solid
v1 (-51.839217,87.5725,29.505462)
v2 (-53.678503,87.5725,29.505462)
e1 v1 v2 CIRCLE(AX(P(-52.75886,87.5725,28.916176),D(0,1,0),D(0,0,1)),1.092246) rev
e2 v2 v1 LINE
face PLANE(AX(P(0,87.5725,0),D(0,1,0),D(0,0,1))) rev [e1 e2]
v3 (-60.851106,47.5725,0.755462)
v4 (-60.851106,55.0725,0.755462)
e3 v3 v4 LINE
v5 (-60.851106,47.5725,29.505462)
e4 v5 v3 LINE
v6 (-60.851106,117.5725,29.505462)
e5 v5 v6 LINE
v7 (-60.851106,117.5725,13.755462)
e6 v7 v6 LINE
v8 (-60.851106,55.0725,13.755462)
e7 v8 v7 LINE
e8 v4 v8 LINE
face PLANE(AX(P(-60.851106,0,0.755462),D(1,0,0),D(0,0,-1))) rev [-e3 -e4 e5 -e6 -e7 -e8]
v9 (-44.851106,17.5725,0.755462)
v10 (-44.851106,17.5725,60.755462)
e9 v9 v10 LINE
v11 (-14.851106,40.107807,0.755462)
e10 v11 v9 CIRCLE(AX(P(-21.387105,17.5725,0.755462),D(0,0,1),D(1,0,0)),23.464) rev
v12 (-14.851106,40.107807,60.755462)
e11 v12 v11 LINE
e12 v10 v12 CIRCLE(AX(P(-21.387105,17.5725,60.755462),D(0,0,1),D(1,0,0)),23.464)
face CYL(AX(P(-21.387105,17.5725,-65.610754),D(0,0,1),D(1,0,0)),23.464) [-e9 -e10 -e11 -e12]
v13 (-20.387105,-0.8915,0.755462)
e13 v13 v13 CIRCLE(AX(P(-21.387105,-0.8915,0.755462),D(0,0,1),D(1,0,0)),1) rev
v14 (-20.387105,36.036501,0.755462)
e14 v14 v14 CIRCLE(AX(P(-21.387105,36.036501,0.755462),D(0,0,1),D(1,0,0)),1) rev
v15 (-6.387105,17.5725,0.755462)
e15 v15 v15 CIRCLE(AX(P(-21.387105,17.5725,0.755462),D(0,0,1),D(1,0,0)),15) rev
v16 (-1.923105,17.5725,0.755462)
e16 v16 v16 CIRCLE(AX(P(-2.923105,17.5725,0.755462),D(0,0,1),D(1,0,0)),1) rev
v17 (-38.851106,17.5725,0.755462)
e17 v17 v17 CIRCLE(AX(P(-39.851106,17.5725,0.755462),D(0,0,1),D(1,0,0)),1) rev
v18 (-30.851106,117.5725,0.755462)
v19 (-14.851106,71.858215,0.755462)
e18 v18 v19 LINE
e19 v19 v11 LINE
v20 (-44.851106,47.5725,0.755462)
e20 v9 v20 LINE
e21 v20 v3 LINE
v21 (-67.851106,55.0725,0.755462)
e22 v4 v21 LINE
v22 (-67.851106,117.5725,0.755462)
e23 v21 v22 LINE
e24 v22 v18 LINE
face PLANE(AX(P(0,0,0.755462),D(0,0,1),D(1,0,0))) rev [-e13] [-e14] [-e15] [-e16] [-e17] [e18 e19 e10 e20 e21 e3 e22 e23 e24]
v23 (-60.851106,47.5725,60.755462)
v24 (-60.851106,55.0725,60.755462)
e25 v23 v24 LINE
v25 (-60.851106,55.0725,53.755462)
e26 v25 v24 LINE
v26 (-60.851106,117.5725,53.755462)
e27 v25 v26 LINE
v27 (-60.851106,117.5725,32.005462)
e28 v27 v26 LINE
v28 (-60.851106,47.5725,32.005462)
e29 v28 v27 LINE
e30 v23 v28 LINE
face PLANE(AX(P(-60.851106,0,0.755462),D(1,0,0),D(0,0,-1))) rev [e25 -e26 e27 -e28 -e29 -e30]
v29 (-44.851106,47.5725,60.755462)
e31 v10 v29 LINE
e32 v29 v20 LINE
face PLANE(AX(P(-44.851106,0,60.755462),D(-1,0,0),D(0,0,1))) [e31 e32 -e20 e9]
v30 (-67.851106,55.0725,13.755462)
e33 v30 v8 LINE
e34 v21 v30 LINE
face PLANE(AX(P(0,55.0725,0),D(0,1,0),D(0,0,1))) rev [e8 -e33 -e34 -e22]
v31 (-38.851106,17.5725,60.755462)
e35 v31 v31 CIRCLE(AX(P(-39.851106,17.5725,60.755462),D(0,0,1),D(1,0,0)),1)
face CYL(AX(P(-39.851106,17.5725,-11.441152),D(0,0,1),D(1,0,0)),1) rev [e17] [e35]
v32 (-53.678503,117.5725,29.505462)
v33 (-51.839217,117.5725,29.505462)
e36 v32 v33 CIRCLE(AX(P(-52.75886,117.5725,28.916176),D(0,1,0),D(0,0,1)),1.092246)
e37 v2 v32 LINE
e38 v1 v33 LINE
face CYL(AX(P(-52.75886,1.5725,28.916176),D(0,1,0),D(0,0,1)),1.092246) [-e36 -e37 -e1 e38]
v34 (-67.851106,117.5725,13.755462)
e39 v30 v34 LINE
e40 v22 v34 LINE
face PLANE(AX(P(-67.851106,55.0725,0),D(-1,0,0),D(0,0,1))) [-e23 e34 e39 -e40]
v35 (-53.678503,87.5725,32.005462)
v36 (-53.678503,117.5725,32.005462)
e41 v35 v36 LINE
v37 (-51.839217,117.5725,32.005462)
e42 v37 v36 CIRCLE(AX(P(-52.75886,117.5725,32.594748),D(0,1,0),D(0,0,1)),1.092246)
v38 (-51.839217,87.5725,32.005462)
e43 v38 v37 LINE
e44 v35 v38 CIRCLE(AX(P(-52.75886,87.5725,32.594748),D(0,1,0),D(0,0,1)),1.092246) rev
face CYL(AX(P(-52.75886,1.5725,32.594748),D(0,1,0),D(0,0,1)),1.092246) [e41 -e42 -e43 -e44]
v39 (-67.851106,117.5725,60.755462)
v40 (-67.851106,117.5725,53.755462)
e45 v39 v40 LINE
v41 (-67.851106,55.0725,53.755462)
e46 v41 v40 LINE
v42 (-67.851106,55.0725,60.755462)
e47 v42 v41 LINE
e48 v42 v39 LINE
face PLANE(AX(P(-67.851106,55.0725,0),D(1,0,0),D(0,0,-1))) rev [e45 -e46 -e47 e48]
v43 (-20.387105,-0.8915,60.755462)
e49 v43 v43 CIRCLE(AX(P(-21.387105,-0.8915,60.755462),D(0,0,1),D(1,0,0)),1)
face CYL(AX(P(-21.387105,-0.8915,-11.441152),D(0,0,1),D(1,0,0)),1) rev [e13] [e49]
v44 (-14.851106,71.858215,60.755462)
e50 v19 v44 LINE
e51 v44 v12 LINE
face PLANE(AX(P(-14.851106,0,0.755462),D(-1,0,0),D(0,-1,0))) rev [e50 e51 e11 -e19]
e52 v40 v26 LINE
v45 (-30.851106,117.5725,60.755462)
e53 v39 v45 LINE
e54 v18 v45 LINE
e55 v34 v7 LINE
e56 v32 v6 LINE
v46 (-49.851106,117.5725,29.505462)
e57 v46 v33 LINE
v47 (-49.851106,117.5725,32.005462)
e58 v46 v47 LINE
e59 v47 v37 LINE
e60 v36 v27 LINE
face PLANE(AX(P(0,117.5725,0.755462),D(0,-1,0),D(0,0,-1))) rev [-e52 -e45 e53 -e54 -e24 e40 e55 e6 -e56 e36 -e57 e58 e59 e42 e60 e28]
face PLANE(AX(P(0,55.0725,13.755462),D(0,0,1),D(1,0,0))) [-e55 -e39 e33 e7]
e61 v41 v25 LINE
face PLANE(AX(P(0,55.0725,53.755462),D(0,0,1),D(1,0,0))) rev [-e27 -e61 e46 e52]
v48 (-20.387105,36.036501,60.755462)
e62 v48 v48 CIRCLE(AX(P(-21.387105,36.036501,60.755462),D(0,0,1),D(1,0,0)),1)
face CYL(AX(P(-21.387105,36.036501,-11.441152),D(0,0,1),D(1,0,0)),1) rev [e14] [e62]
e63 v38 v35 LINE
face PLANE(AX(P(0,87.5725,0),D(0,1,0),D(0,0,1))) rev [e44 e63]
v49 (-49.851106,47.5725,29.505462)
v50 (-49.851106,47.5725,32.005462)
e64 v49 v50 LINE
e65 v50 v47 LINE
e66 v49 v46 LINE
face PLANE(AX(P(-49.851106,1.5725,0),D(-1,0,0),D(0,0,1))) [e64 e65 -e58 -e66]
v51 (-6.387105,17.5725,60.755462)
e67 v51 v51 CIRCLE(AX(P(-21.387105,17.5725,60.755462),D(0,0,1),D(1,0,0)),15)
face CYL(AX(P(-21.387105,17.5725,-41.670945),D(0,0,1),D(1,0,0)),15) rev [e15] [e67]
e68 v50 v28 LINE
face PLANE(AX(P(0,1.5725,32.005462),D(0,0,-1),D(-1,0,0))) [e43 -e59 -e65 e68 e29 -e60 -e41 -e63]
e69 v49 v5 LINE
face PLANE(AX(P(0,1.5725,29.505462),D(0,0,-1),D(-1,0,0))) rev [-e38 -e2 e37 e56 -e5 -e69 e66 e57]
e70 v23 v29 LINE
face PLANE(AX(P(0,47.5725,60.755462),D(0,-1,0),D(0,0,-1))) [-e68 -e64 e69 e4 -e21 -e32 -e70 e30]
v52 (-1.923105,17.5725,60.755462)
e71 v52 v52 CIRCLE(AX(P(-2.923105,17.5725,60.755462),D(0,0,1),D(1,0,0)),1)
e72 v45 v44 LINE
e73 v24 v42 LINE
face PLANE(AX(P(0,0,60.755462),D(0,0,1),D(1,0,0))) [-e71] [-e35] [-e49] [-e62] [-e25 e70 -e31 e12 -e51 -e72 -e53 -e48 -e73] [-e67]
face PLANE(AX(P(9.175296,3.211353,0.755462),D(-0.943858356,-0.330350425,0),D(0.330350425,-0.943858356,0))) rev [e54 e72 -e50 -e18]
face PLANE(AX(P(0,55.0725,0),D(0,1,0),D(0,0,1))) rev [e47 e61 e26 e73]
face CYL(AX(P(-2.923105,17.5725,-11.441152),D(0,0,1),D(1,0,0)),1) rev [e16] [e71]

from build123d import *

# Parameters (mm, degrees)
BOSS_EXTRUDE1_OUTLINE_R = 16
BOSS_EXTRUDE1_DEPTH     = 60
BOSS_EXTRUDE2_START     = -60
BOSS_EXTRUDE2_DEPTH     = 60
CUT_EXTRUDE1_DEPTH      = 145.395578885
CUT_EXTRUDE2_DEPTH      = 145.395578885
SKETCH5_W               = 40
SKETCH5_H               = 37.745966692
CUT_EXTRUDE5_DEPTH      = 146.348374233
BOSS_EXTRUDE3_START     = -60
BOSS_EXTRUDE3_DEPTH     = 60
CUT_EXTRUDE6_START      = -60
SKETCH10_4_R            = 1
CUT_EXTRUDE6_DEPTH      = 60
CUT_EXTRUDE7_DEPTH      = 60
BOSS_EXTRUDE4_DEPTH     = 70
SKETCH12_W              = 7
SKETCH12_H              = 13
SKETCH12_H_2            = 7
BOSS_EXTRUDE5_DEPTH     = 62.5
SKETCH13_W              = 11
SKETCH13_H              = 2.5
CUT_EXTRUDE8_DEPTH      = 40


# Read off the part's stored shape, not the designer's step: Boss-Extrude1, Boss-Extrude3
with BuildPart() as part:
    # Boss-Extrude1 outline → Boss-Extrude1 (new body)
    with BuildSketch(Plane.XY.offset(0.755461794)):
        with Locations((-30.851105688, 17.572500308)):
            Circle(BOSS_EXTRUDE1_OUTLINE_R)
        with BuildLine():
            Line((-28.166301776, 21.908607365), (-28.260226262, 22.19606428))
            ThreePointArc((-28.260226262, 22.19606428), (-28.158199405, 22.137394146), (-28.057500467, 22.076472985))
            Line((-28.057500467, 22.076472985), (-28.166301776, 21.908607365))
        make_face(mode=Mode.SUBTRACT)
    extrude(amount=BOSS_EXTRUDE1_DEPTH)

    # Sketch2 → Boss-Extrude2 (add)
    with BuildSketch(Plane.XY.offset(60.755461794).offset(BOSS_EXTRUDE2_START)):
        with BuildLine():
            Line((-60.851105688, 17.572500308), (-46.851105688, 17.572500308))
            ThreePointArc((-46.851105688, 17.572500308), (-30.851105688, 33.572500308), (-14.851105688, 17.572500308))
            Line((-14.851105688, 17.572500308), (-14.851105688, 71.858214594))
            Line((-14.851105688, 71.858214594), (-30.851105688, 117.572500308))
            Line((-30.851105688, 117.572500308), (-60.851105688, 117.572500308))
            Line((-60.851105688, 117.572500308), (-60.851105688, 17.572500308))
        make_face()
    extrude(amount=BOSS_EXTRUDE2_DEPTH)

    # Sketch3 → Cut-Extrude1 (cut, through all)
    with BuildSketch(Plane(origin=(0, 117.572500308, 0), x_dir=(1, 0, 0), z_dir=(0, 1, 0))):
        with BuildLine():
            Line((-60.851105688, -29.505461794), (-60.851105688, -32.005461794))
            Line((-60.851105688, -32.005461794), (-53.678502861, -32.005461794))
            ThreePointArc((-53.678502861, -32.005461794), (-52.758859998, -31.502501818), (-51.839217136, -32.005461794))
            Line((-51.839217136, -32.005461794), (-49.851105688, -32.005461794))
            Line((-49.851105688, -32.005461794), (-49.851105688, -29.505461794))
            Line((-49.851105688, -29.505461794), (-51.839217136, -29.505461794))
            ThreePointArc((-51.839217136, -29.505461794), (-52.758859998, -30.00842177), (-53.678502861, -29.505461794))
            Line((-53.678502861, -29.505461794), (-60.851105688, -29.505461794))
        make_face()
    extrude(amount=-CUT_EXTRUDE1_DEPTH, mode=Mode.SUBTRACT)

    # Sketch4 → Cut-Extrude2 (cut, through all)
    with BuildSketch(Plane(origin=(0, 117.572500308, 0), x_dir=(1, 0, 0), z_dir=(0, 1, 0))):
        Polygon((-60.851105688, -27.255461794), (-44.851105688, -0.755461794), (-60.851105688, -0.755461794), align=None)
        Polygon((-60.851105688, -34.255461794), (-44.851105688, -60.755461794), (-60.851105688, -60.755461794), align=None)
    extrude(amount=-CUT_EXTRUDE2_DEPTH, mode=Mode.SUBTRACT)

    # Sketch5 → Cut-Extrude5 (cut, through all)
    with BuildSketch(Plane(origin=(0, 0, 0.755461794), x_dir=(-1, 0, 0), z_dir=(0, 0, -1))):
        with Locations((64.851105688, 28.699516962)):
            Rectangle(SKETCH5_W, SKETCH5_H)
    extrude(amount=-CUT_EXTRUDE5_DEPTH, mode=Mode.SUBTRACT)

    # Boss-Extrude3 outline → Boss-Extrude3 (add)
    with BuildSketch(Plane.XY.offset(60.755461794).offset(BOSS_EXTRUDE3_START)):
        with BuildLine():
            ThreePointArc((-14.851105688, 17.572500308), (-24.419989547, 2.92187762), (-41.681198835, 5.795018301))
            ThreePointArc((-41.681198835, 5.795018301), (-2.90297286, 3.119259484), (-14.851105688, 40.107806589))
            Line((-14.851105688, 40.107806589), (-14.851105688, 17.572500308))
        make_face()
    extrude(amount=BOSS_EXTRUDE3_DEPTH)

    # Sketch10<4> → Cut-Extrude6 (cut)
    with BuildSketch(Plane.XY.offset(60.755461794).offset(CUT_EXTRUDE6_START)):
        with BuildLine():
            ThreePointArc((-44.851105688, 9.826533616), (-43.428731074, 7.682943208), (-41.681198835, 5.795018301))
            ThreePointArc((-41.681198835, 5.795018301), (-44.044774342, 11.474193332), (-44.851105688, 17.572500308))
            Line((-44.851105688, 17.572500308), (-44.851105688, 9.826533616))
        make_face()
        with BuildLine():
            ThreePointArc((-40.851105688, 17.572500308), (-39.851105688, 16.572500308), (-38.851105688, 17.572500308))
            Line((-38.851105688, 17.572500308), (-40.851105688, 17.572500308))
        make_face()
        with BuildLine():
            Line((-40.851105688, 17.572500308), (-38.851105688, 17.572500308))
            ThreePointArc((-38.851105688, 17.572500308), (-39.851105688, 18.572500308), (-40.851105688, 17.572500308))
        make_face()
        with BuildLine():
            ThreePointArc((-20.387105202, -0.891500177), (-20.679998421, -0.184393396), (-21.387105202, 0.108499823))
            Line((-21.387105202, 0.108499823), (-21.387105202, -1.891500177))
            ThreePointArc((-21.387105202, -1.891500177), (-20.679998421, -1.598606959), (-20.387105202, -0.891500177))
        make_face()
        with BuildLine():
            Line((-21.387105202, -1.891500177), (-21.387105202, 0.108499823))
            ThreePointArc((-21.387105202, 0.108499823), (-22.387105202, -0.891500177), (-21.387105202, -1.891500177))
        make_face()
        with BuildLine():
            ThreePointArc((-2.923104717, 18.572500308), (-3.630211498, 18.27960709), (-3.923104717, 17.572500308))
            Line((-3.923104717, 17.572500308), (-2.923104717, 17.572500308))
            Line((-2.923104717, 17.572500308), (-2.923104717, 18.572500308))
        make_face()
        with BuildLine():
            Line((-2.923104717, 17.572500308), (-3.923104717, 17.572500308))
            ThreePointArc((-3.923104717, 17.572500308), (-2.923104717, 16.572500308), (-1.923104717, 17.572500308))
            ThreePointArc((-1.923104717, 17.572500308), (-2.215997935, 18.27960709), (-2.923104717, 18.572500308))
            Line((-2.923104717, 18.572500308), (-2.923104717, 17.572500308))
        make_face()
        with Locations((-21.387105202, 36.036500794)):
            Circle(SKETCH10_4_R)
    extrude(amount=CUT_EXTRUDE6_DEPTH, mode=Mode.SUBTRACT)

    # Sketch10<5> → Cut-Extrude7 (cut)
    # profile 1 of 6: a face of its own
    with BuildSketch(Plane.XY.offset(60.755461794)):
        with BuildLine():
            ThreePointArc((-14.851105688, 17.572500308), (-16.578334273, 10.341456392), (-21.387105202, 4.671620695))
            Line((-21.387105202, 4.671620695), (-21.387105202, 2.572500308))
            ThreePointArc((-21.387105202, 2.572500308), (-10.780503485, 6.965898591), (-6.387105202, 17.572500308))
            Line((-6.387105202, 17.572500308), (-14.851105688, 17.572500308))
        make_face()
    # profile 2 of 6: a face of its own
    with BuildSketch(Plane.XY.offset(60.755461794)):
        with BuildLine():
            Line((-14.851105688, 31.073637681), (-14.851105688, 17.572500308))
            Line((-14.851105688, 17.572500308), (-6.387105202, 17.572500308))
            ThreePointArc((-6.387105202, 17.572500308), (-8.678053454, 25.539934252), (-14.851105688, 31.073637681))
        make_face()
    # profile 3 of 6: a face of its own
    with BuildSketch(Plane.XY.offset(60.755461794)):
        with BuildLine():
            Line((-30.851105688, 17.572500308), (-21.387105202, 17.572500308))
            Line((-21.387105202, 17.572500308), (-14.851105688, 17.572500308))
            Line((-14.851105688, 17.572500308), (-14.851105688, 31.073637681))
            ThreePointArc((-14.851105688, 31.073637681), (-29.354539146, 30.281552057), (-36.387105202, 17.572500308))
            Line((-36.387105202, 17.572500308), (-30.851105688, 17.572500308))
        make_face()
        with BuildLine():
            Line((-28.166301776, 21.908607365), (-28.260226262, 22.19606428))
            ThreePointArc((-28.260226262, 22.19606428), (-28.158199405, 22.137394146), (-28.057500467, 22.076472985))
            Line((-28.057500467, 22.076472985), (-28.166301776, 21.908607365))
        make_face(mode=Mode.SUBTRACT)
    # profile 4 of 6: a face of its own
    with BuildSketch(Plane.XY.offset(60.755461794)):
        with BuildLine():
            Line((-14.851105688, 17.572500308), (-21.387105202, 17.572500308))
            Line((-21.387105202, 17.572500308), (-21.387105202, 4.671620695))
            ThreePointArc((-21.387105202, 4.671620695), (-16.578334273, 10.341456392), (-14.851105688, 17.572500308))
        make_face()
    # profile 5 of 6: a face of its own
    with BuildSketch(Plane.XY.offset(60.755461794)):
        with BuildLine():
            Line((-21.387105202, 4.671620695), (-21.387105202, 17.572500308))
            Line((-21.387105202, 17.572500308), (-30.851105688, 17.572500308))
            Line((-30.851105688, 17.572500308), (-36.387105202, 17.572500308))
            ThreePointArc((-36.387105202, 17.572500308), (-33.036423327, 8.122982478), (-24.481320238, 2.895108397))
            ThreePointArc((-24.481320238, 2.895108397), (-22.884538469, 3.696845126), (-21.387105202, 4.671620695))
        make_face()
    # profile 6 of 6: a face of its own
    with BuildSketch(Plane.XY.offset(60.755461794)):
        with BuildLine():
            Line((-21.387105202, 2.572500308), (-21.387105202, 4.671620695))
            ThreePointArc((-21.387105202, 4.671620695), (-22.884538469, 3.696845126), (-24.481320238, 2.895108397))
            ThreePointArc((-24.481320238, 2.895108397), (-22.942598907, 2.653370329), (-21.387105202, 2.572500308))
        make_face()
    extrude(amount=-CUT_EXTRUDE7_DEPTH, mode=Mode.SUBTRACT)

    # Sketch11 → Boss-Extrude4 (add)
    with BuildSketch(Plane(origin=(0, 117.572500308, 0), x_dir=(1, 0, 0), z_dir=(0, 1, 0))):
        Polygon((-44.851105688, -0.755461794), (-60.851105688, -0.755461794), (-60.851105688, -27.255461794), align=None)
        Polygon((-60.851105688, -34.255461794), (-60.851105688, -60.755461794), (-44.851105688, -60.755461794), align=None)
    extrude(amount=-BOSS_EXTRUDE4_DEPTH)

    # Sketch12 → Boss-Extrude5 (add)
    with BuildSketch(Plane(origin=(0, 117.572500308, 0), x_dir=(1, 0, 0), z_dir=(0, 1, 0))):
        with Locations((-64.351105688, -7.255461794)):
            Rectangle(SKETCH12_W, SKETCH12_H)
        with Locations((-64.351105688, -57.255461794)):
            Rectangle(SKETCH12_W, SKETCH12_H_2)
    extrude(amount=-BOSS_EXTRUDE5_DEPTH)

    # Sketch13 → Cut-Extrude8 (cut)
    with BuildSketch(Plane.XZ.offset(-47.572500308)):
        with Locations((-55.351105688, 30.755461794)):
            Rectangle(SKETCH13_W, SKETCH13_H)
    extrude(amount=-CUT_EXTRUDE8_DEPTH, mode=Mode.SUBTRACT)


solid = part.part
